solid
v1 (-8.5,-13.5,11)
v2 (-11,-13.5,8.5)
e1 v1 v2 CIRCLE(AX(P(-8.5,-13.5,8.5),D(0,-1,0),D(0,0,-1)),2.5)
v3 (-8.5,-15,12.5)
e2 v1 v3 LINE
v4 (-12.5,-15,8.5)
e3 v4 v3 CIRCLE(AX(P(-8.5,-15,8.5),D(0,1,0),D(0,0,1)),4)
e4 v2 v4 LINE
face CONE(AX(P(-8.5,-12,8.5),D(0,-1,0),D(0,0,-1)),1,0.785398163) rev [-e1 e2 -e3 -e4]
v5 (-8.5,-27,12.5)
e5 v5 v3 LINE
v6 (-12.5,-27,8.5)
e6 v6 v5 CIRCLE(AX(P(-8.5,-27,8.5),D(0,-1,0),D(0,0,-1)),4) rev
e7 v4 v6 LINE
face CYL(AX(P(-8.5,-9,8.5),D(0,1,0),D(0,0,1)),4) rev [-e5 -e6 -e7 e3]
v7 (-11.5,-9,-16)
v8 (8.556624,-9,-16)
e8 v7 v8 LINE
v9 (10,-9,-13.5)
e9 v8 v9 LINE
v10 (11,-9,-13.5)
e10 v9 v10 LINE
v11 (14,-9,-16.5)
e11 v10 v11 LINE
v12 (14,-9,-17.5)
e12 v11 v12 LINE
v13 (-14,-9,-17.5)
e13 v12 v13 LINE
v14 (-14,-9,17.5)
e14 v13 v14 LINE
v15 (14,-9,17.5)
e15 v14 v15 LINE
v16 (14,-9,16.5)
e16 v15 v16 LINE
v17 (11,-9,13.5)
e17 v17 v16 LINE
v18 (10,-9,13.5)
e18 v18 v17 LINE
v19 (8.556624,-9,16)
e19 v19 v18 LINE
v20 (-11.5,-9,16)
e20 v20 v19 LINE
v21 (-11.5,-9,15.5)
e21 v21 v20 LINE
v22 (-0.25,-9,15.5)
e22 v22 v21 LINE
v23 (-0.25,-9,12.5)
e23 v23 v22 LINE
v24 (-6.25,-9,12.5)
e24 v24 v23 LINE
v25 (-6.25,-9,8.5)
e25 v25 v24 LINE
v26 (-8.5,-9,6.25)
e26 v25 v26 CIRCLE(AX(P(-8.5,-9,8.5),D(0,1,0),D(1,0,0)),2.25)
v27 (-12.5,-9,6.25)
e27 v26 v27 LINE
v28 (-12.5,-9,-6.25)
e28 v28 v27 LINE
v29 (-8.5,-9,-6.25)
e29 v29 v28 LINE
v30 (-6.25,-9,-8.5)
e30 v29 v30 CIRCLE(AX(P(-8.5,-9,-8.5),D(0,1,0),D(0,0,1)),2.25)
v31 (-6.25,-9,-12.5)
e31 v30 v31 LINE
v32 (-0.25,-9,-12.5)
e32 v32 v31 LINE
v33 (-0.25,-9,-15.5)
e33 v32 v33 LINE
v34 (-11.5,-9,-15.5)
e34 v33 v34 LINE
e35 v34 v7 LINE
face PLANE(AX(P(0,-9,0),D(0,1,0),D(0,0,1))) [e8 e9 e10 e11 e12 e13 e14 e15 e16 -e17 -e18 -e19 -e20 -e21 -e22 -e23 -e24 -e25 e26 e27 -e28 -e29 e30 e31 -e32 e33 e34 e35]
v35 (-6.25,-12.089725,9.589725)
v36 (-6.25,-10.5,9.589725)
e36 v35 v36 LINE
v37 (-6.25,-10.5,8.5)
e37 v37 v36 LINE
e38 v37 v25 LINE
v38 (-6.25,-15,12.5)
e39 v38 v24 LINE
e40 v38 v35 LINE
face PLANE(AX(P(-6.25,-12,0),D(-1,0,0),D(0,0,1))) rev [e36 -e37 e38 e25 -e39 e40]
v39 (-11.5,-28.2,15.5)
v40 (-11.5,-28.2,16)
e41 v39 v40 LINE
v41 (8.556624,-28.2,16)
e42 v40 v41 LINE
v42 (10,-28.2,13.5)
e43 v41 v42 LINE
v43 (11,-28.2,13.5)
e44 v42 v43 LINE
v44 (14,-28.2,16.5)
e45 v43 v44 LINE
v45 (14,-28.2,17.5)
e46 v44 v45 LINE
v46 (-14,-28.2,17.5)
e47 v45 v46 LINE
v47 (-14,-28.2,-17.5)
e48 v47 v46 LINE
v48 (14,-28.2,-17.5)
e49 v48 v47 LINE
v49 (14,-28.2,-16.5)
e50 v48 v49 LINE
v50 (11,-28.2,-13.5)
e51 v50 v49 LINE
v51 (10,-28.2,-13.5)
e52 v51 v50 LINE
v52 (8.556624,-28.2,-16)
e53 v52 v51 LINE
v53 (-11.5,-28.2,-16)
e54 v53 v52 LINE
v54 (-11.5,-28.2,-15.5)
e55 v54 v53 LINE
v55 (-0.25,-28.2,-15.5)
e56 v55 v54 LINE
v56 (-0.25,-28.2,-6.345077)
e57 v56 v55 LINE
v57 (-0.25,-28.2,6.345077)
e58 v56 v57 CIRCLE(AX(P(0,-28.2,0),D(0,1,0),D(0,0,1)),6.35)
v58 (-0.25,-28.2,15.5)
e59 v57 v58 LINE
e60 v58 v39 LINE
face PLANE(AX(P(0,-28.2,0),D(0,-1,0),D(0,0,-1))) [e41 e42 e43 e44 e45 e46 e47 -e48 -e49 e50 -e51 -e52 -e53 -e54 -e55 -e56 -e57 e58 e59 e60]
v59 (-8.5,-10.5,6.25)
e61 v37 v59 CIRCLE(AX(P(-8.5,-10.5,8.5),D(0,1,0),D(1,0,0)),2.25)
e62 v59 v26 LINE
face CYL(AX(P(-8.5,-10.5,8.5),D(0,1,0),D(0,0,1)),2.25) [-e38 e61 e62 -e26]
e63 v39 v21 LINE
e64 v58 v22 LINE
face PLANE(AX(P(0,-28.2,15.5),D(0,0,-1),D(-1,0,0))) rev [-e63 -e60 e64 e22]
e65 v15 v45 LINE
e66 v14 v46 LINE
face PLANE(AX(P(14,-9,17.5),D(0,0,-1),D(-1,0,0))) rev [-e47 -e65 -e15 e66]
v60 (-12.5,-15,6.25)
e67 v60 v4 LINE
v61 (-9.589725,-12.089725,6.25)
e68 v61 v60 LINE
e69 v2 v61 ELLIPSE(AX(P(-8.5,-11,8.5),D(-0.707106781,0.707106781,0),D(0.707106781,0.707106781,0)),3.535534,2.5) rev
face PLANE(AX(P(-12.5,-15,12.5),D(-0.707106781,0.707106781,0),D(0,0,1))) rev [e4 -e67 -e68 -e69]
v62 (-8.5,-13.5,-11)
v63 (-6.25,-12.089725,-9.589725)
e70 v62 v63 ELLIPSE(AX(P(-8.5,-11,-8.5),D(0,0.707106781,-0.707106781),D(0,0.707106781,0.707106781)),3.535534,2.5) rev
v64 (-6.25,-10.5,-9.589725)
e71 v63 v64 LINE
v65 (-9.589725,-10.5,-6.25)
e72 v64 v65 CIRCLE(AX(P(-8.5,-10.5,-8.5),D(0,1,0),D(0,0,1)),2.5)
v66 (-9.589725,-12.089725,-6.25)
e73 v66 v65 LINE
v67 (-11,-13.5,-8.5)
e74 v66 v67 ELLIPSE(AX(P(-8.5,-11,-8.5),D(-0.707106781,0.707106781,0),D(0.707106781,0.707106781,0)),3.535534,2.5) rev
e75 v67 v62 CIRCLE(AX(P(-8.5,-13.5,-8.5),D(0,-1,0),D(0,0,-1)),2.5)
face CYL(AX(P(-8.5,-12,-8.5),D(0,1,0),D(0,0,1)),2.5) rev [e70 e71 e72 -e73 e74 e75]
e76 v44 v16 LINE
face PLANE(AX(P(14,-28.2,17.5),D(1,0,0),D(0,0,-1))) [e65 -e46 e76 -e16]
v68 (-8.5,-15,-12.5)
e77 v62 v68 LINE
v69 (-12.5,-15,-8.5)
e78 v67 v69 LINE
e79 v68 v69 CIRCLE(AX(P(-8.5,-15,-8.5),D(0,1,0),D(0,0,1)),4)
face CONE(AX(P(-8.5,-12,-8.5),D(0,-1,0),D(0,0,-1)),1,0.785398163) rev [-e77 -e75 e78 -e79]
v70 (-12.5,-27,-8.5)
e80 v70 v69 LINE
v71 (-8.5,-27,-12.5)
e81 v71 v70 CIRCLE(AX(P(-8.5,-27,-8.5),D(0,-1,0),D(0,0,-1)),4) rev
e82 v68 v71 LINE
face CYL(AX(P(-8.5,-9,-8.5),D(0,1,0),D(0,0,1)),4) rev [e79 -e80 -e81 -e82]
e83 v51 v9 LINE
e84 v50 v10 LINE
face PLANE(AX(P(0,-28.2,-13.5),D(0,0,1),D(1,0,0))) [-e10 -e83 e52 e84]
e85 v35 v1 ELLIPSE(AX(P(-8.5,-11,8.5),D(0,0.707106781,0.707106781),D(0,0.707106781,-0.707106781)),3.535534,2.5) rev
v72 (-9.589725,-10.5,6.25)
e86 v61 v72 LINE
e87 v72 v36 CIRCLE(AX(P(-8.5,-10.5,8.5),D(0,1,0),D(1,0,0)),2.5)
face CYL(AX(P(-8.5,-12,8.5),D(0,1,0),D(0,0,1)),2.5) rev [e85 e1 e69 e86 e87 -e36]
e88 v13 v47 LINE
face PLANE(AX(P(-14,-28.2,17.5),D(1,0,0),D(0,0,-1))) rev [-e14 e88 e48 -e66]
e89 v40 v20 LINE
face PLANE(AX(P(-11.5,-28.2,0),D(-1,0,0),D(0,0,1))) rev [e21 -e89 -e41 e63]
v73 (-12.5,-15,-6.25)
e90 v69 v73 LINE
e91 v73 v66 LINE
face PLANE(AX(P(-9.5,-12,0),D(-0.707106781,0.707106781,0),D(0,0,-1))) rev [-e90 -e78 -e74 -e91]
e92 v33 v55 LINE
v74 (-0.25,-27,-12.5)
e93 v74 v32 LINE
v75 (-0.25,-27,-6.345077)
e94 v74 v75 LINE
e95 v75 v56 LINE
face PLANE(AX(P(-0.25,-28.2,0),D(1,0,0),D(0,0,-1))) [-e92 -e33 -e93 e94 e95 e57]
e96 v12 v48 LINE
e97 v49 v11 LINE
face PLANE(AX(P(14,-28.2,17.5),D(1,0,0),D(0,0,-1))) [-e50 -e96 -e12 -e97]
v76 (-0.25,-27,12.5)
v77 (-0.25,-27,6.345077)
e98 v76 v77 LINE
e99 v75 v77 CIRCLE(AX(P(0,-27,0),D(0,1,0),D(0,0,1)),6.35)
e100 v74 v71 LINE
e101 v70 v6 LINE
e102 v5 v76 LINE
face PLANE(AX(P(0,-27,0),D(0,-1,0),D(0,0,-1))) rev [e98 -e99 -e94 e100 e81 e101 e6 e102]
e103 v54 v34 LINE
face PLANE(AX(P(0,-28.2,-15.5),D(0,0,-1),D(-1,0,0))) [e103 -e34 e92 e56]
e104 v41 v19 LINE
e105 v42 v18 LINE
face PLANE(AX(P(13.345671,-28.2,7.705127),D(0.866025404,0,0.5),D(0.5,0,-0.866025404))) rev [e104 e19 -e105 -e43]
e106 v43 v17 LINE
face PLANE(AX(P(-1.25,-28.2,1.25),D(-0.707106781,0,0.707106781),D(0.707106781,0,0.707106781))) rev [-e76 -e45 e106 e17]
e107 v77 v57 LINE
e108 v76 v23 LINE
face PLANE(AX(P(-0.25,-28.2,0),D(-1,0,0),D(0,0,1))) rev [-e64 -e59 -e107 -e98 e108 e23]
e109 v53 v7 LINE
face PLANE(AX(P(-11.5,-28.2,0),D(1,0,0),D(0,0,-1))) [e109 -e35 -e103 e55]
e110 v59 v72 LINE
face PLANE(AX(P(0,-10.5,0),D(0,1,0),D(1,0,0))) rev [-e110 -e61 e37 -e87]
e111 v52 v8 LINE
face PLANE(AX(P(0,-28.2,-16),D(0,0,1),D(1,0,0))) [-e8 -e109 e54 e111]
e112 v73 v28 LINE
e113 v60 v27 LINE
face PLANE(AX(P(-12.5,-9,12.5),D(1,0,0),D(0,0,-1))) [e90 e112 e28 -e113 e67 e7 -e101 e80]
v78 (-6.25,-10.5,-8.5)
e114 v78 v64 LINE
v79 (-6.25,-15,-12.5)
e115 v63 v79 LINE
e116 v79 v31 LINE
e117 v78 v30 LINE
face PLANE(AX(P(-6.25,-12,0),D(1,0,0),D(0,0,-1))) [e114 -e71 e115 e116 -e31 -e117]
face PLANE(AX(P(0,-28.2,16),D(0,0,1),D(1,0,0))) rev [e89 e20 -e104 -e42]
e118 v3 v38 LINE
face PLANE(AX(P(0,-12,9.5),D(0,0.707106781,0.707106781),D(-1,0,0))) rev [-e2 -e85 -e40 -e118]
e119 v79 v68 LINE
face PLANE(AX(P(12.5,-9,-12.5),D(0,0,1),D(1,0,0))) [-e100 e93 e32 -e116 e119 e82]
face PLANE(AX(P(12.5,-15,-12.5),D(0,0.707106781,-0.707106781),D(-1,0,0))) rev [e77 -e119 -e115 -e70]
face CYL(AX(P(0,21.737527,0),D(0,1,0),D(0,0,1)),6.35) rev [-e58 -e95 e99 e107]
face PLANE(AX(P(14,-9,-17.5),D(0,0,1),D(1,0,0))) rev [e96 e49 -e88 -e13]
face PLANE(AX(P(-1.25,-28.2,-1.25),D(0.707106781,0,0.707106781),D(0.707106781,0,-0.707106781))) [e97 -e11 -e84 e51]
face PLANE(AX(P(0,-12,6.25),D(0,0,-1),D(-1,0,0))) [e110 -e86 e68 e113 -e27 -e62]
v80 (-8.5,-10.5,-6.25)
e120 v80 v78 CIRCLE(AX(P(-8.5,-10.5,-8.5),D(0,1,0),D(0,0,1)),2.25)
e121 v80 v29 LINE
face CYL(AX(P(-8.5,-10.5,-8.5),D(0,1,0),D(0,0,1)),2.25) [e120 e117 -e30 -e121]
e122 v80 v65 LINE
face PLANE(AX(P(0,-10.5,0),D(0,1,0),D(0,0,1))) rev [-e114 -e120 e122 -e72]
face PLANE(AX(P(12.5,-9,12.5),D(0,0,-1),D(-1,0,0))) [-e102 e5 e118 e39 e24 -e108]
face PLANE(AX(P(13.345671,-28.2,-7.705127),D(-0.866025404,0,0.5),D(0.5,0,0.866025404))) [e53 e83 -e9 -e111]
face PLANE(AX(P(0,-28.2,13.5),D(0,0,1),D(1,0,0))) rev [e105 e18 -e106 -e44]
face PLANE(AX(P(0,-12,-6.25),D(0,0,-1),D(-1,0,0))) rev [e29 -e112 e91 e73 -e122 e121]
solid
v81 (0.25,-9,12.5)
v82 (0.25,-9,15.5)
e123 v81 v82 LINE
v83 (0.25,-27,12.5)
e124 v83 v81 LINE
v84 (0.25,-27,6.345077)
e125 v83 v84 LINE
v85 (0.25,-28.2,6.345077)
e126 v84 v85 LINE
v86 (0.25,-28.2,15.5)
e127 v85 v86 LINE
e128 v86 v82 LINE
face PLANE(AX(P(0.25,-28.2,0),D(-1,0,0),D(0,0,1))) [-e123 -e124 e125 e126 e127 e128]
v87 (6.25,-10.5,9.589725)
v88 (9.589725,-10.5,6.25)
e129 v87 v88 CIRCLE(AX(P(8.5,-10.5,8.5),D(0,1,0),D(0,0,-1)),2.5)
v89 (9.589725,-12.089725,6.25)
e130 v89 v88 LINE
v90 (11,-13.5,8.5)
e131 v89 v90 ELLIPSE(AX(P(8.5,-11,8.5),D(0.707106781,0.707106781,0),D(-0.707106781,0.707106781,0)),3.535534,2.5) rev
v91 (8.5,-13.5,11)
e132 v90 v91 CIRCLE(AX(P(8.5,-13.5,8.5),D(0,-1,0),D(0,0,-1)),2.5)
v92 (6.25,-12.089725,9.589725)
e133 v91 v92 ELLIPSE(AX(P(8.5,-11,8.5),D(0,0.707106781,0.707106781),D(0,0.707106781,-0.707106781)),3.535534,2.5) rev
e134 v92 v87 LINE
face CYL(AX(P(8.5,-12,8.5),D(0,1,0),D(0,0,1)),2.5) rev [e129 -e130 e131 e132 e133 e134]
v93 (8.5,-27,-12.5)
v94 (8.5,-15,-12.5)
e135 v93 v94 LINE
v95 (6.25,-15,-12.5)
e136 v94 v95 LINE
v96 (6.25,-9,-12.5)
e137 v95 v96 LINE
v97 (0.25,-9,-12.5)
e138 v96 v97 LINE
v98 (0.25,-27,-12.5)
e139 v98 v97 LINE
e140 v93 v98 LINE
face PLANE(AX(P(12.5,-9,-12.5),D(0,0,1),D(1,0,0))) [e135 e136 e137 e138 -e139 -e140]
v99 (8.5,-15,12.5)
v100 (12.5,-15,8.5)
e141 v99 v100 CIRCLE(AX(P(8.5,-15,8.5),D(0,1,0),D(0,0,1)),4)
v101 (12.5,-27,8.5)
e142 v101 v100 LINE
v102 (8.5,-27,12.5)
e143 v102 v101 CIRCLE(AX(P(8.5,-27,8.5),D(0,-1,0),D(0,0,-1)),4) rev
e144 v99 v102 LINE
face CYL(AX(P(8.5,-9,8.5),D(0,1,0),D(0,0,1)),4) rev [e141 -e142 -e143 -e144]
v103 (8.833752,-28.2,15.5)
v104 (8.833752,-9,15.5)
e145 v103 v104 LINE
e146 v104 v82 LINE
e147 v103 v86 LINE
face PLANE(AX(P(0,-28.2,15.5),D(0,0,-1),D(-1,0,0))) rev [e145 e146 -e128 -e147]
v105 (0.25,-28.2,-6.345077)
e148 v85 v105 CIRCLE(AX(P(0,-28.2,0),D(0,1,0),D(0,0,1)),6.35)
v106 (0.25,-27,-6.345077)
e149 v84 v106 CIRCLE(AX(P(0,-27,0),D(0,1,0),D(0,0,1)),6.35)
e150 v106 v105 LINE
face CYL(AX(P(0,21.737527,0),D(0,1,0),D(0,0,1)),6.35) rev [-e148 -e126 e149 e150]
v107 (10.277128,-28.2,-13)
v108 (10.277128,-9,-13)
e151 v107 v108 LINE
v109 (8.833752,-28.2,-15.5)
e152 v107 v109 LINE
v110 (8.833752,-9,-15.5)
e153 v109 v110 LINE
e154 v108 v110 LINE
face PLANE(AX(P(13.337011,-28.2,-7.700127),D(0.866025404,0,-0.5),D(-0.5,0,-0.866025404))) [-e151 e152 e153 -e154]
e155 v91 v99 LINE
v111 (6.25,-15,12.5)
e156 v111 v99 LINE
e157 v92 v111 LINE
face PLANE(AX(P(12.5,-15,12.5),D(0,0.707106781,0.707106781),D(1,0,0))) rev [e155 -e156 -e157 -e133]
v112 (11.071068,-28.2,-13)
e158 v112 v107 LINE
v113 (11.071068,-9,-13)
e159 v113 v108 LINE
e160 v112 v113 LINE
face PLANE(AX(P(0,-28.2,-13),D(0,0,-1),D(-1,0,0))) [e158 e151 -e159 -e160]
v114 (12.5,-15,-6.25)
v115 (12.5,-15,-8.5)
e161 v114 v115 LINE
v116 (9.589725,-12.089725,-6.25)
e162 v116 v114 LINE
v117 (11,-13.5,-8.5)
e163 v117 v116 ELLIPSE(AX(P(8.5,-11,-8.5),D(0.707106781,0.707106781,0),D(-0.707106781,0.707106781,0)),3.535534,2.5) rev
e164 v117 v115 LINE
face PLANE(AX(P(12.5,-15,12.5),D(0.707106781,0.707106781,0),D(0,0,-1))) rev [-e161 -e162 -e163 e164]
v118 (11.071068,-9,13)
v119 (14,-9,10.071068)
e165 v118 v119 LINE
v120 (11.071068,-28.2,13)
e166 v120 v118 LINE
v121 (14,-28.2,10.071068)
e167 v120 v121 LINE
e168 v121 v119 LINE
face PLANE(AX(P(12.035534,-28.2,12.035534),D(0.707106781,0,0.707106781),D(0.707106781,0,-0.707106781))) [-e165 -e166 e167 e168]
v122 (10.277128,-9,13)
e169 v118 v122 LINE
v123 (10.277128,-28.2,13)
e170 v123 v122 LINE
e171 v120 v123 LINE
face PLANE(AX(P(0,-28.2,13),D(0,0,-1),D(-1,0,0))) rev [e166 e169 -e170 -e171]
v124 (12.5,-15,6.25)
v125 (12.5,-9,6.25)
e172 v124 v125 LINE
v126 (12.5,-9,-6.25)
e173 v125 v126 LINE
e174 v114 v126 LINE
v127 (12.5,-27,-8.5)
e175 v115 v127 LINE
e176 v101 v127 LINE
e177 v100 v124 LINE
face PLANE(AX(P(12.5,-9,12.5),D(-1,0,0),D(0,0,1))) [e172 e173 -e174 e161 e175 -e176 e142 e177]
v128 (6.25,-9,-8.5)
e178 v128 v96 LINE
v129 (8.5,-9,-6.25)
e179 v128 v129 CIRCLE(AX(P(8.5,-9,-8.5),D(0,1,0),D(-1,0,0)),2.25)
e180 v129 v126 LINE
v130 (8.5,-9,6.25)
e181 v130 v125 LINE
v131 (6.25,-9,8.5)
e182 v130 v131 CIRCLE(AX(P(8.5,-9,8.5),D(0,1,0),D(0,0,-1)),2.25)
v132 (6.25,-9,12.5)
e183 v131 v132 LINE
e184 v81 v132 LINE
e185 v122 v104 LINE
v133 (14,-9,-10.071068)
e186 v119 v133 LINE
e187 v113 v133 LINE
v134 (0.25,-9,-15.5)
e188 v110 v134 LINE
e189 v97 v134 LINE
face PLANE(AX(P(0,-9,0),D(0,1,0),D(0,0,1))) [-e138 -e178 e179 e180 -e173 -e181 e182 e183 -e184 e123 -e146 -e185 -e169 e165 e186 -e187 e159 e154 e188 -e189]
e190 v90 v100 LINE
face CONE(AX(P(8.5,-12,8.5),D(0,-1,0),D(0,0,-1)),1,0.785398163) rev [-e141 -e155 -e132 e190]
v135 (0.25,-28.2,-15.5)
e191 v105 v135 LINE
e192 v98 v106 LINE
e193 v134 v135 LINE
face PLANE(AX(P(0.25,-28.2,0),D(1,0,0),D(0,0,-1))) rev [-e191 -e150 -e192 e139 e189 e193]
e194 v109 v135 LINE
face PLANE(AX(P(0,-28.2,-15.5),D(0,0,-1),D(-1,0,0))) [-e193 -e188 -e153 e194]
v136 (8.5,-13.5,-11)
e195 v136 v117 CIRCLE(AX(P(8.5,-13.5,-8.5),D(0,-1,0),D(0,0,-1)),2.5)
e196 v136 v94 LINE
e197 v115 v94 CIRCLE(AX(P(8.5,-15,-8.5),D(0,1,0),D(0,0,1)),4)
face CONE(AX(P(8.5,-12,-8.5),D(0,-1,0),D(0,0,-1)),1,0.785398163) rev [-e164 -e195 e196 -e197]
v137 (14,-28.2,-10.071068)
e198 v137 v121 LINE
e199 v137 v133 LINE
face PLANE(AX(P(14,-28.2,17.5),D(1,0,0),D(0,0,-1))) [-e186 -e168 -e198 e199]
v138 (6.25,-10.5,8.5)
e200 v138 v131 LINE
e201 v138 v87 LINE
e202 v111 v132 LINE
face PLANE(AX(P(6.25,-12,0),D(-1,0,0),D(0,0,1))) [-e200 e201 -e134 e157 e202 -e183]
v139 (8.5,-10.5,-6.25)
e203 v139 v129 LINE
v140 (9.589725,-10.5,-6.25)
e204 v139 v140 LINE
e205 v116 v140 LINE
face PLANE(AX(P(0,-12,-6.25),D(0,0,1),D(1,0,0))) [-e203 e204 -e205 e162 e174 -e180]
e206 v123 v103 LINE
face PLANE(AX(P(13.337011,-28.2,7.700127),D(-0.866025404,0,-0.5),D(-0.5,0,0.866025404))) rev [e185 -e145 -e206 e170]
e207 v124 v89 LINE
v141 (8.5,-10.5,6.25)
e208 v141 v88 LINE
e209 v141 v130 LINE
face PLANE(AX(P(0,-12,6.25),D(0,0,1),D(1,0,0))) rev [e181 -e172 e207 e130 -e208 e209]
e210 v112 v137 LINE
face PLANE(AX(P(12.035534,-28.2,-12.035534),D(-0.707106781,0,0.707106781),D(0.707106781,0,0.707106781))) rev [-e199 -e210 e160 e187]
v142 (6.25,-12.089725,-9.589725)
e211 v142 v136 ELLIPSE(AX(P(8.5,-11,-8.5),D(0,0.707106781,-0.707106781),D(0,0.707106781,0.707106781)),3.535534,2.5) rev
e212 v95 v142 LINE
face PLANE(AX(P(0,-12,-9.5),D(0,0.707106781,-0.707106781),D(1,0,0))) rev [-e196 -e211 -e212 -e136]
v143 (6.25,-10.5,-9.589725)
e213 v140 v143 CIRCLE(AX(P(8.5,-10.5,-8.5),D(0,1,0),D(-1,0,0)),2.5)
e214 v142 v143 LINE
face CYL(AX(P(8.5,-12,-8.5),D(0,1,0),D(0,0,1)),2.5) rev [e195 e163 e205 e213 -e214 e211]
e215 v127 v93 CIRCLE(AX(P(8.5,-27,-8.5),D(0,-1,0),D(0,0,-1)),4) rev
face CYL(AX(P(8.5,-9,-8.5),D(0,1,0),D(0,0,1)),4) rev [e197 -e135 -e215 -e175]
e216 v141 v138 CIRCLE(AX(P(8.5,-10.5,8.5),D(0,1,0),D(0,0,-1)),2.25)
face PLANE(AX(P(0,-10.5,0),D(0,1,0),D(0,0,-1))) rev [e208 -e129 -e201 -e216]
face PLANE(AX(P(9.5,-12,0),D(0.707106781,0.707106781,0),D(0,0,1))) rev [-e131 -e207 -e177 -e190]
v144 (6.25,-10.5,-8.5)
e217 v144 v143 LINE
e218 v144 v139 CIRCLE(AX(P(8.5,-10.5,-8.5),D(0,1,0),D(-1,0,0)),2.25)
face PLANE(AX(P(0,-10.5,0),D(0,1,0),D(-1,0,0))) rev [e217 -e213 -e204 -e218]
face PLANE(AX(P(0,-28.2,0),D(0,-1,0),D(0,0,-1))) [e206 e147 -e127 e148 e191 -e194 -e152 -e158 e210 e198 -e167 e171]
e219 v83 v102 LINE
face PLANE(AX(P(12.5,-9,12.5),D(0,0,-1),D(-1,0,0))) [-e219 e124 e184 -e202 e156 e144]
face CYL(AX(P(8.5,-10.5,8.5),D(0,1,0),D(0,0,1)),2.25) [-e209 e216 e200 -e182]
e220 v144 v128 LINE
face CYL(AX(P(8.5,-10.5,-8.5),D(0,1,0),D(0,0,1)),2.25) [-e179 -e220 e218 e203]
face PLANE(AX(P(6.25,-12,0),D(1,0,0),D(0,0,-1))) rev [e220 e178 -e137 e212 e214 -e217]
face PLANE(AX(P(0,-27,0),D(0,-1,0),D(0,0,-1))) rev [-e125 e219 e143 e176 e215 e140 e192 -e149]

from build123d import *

# Parameters (mm, degrees)
SKETCH1_W           = 8.4
SKETCH1_H           = 3
SKETCH2_OUTSIDE_W   = 44.372
SKETCH2_OUTSIDE_H   = 44.372
SKETCH2_OUTSIDE_W_2 = 28
SKETCH2_OUTSIDE_H_2 = 35
CUT_EXTRUDE2_DEPTH  = 24.70949177
SKETCH2_3_W         = 28
SKETCH2_3_H         = 35
SKETCH2_3_W_2       = 25
SKETCH2_3_H_2       = 25
BOSS_EXTRUDE1_DEPTH = 15
BOSS_EXTRUDE2_START = -4.2
BOSS_EXTRUDE2_DEPTH = 4.2
FILLET1_R           = 4
BOSS_EXTRUDE4_DEPTH = 3
SKETCH3_5_R         = 2.25
SKETCH3_5_R_2       = 1.45
BOSS_EXTRUDE6_DEPTH = 1.5
SKETCH3_R           = 1.45
BOSS_EXTRUDE3_DEPTH = 1.5
CIRPATTERN7_COUNT   = 4
CHAMFER1_SIZE       = 3
CUT_EXTRUDE6_START  = -3
CUT_EXTRUDE6_DEPTH  = 3
CUT_EXTRUDE5_START  = -19.2
CUT_EXTRUDE5_DEPTH  = 19.2


# Read off the part's stored shape, not the designer's step: Cut-Extrude5
with BuildPart() as part:
    # Sketch1 → Revolve2 (revolve)
    with BuildSketch(Plane.XY, mode=Mode.PRIVATE) as revolve2_sk:
        with Locations((-12.3, -25.5)):
            Rectangle(SKETCH1_W, SKETCH1_H)
        Polygon((-6.35, -27), (-8.1, -27), (-16.5, -27), (-16.5, -28.2), (-8.1, -28.2), (-6.35, -28.2), align=None)
    revolve(revolve2_sk.sketch.rotate(Axis((0, 21.737527327, 0), (0, -1, 0)), 270), axis=Axis((0, 21.737527327, 0), (0, -1, 0)))

    # Sketch2 outside → Cut-Extrude2 (cut, through all)
    with BuildSketch(Plane(origin=(0, -24, 0), x_dir=(1, 0, 0), z_dir=(0, 1, 0))):
        Rectangle(SKETCH2_OUTSIDE_W, SKETCH2_OUTSIDE_H)
        Rectangle(SKETCH2_OUTSIDE_W_2, SKETCH2_OUTSIDE_H_2, mode=Mode.SUBTRACT)
    extrude(amount=-CUT_EXTRUDE2_DEPTH, mode=Mode.SUBTRACT)

    # Sketch2<3> → Boss-Extrude1 (add)
    with BuildSketch(Plane(origin=(0, -24, 0), x_dir=(1, 0, 0), z_dir=(0, 1, 0))):
        Rectangle(SKETCH2_3_W, SKETCH2_3_H)
        Rectangle(SKETCH2_3_W_2, SKETCH2_3_H_2, mode=Mode.SUBTRACT)
    extrude(amount=BOSS_EXTRUDE1_DEPTH)

    # Sketch2<4> → Boss-Extrude2 (add)
    with BuildSketch(Plane(origin=(0, -24, 0), x_dir=(1, 0, 0), z_dir=(0, 1, 0)).offset(BOSS_EXTRUDE2_START)):
        with BuildLine():
            Line((-12.5, -12.5), (-10.770329614, -12.5))
            ThreePointArc((-10.770329614, -12.5), (-11.66726189, -11.66726189), (-12.5, -10.770329614))
            Line((-12.5, -10.770329614), (-12.5, -12.5))
        make_face()
        with BuildLine():
            Line((12.5, -10.770329614), (12.5, -12.5))
            Line((12.5, -12.5), (10.770329614, -12.5))
            ThreePointArc((10.770329614, -12.5), (0, -16.5), (-10.770329614, -12.5))
            Line((-10.770329614, -12.5), (-12.5, -12.5))
            Line((-12.5, -12.5), (-12.5, -10.770329614))
            ThreePointArc((-12.5, -10.770329614), (-13.289133528, -9.7800271), (-14, -8.732124598))
            Line((-14, -8.732124598), (-14, -17.5))
            Line((-14, -17.5), (14, -17.5))
            Line((14, -17.5), (14, -8.732124598))
            ThreePointArc((14, -8.732124598), (13.289133528, -9.7800271), (12.5, -10.770329614))
        make_face()
        with BuildLine():
            Line((10.770329614, -12.5), (12.5, -12.5))
            Line((12.5, -12.5), (12.5, -10.770329614))
            ThreePointArc((12.5, -10.770329614), (11.66726189, -11.66726189), (10.770329614, -12.5))
        make_face()
        with BuildLine():
            Line((12.5, 12.5), (12.5, 10.770329614))
            ThreePointArc((12.5, 10.770329614), (13.289133528, 9.7800271), (14, 8.732124598))
            Line((14, 8.732124598), (14, 17.5))
            Line((14, 17.5), (-14, 17.5))
            Line((-14, 17.5), (-14, 8.732124598))
            ThreePointArc((-14, 8.732124598), (-13.289133528, 9.7800271), (-12.5, 10.770329614))
            Line((-12.5, 10.770329614), (-12.5, 12.5))
            Line((-12.5, 12.5), (-10.770329614, 12.5))
            ThreePointArc((-10.770329614, 12.5), (0, 16.5), (10.770329614, 12.5))
            Line((10.770329614, 12.5), (12.5, 12.5))
        make_face()
        with BuildLine():
            ThreePointArc((10.770329614, 12.5), (11.66726189, 11.66726189), (12.5, 10.770329614))
            Line((12.5, 10.770329614), (12.5, 12.5))
            Line((12.5, 12.5), (10.770329614, 12.5))
        make_face()
        with BuildLine():
            Line((-12.5, 12.5), (-12.5, 10.770329614))
            ThreePointArc((-12.5, 10.770329614), (-11.66726189, 11.66726189), (-10.770329614, 12.5))
            Line((-10.770329614, 12.5), (-12.5, 12.5))
        make_face()
    extrude(amount=BOSS_EXTRUDE2_DEPTH)

    # Fillet1
    fillet1_edges = [part.edges().sort_by_distance(p)[0] for p in [
        (-12.5, -16.5, 12.5),
        (12.5, -16.5, 12.5),
        (12.5, -16.5, -12.5),
        (-12.5, -16.5, -12.5),
    ]]
    fillet(fillet1_edges, radius=FILLET1_R)

    # Sketch3<3> → Boss-Extrude4 (add)
    with BuildSketch(Plane(origin=(0, -9, 0), x_dir=(1, 0, 0), z_dir=(0, 1, 0))):
        with BuildLine():
            Line((-12.5, 12.5), (-12.5, 8.5))
            ThreePointArc((-12.5, 8.5), (-11.328427125, 11.328427125), (-8.5, 12.5))
            Line((-8.5, 12.5), (-12.5, 12.5))
        make_face()
        with BuildLine():
            Line((-12.5, 6.25), (-9.589724736, 6.25))
            ThreePointArc((-9.589724736, 6.25), (-10.267766953, 10.267766953), (-6.25, 9.589724736))
            Line((-6.25, 9.589724736), (-6.25, 12.5))
            Line((-6.25, 12.5), (-8.5, 12.5))
            ThreePointArc((-8.5, 12.5), (-11.328427125, 11.328427125), (-12.5, 8.5))
            Line((-12.5, 8.5), (-12.5, 6.25))
        make_face()
    boss_extrude4 = extrude(amount=-BOSS_EXTRUDE4_DEPTH)

    # Sketch3<5> → Boss-Extrude6 (add)
    # profile 1 of 2: a face of its own
    with BuildSketch(Plane(origin=(0, -9, 0), x_dir=(1, 0, 0), z_dir=(0, 1, 0))):
        with BuildLine():
            Line((-9.589724736, 6.25), (-8.5, 6.25))
            ThreePointArc((-8.5, 6.25), (-10.090990258, 10.090990258), (-6.25, 8.5))
            Line((-6.25, 8.5), (-6.25, 9.589724736))
            ThreePointArc((-6.25, 9.589724736), (-10.267766953, 10.267766953), (-9.589724736, 6.25))
        make_face()
    # profile 2 of 2: a face of its own
    with BuildSketch(Plane(origin=(0, -9, 0), x_dir=(1, 0, 0), z_dir=(0, 1, 0))):
        with Locations((-8.5, 8.5)):
            Circle(SKETCH3_5_R)
        with Locations(Location((-8.5, 8.5, 0), (0, 0, 270))):
            Circle(SKETCH3_5_R_2, mode=Mode.SUBTRACT)
    boss_extrude6 = extrude(amount=-BOSS_EXTRUDE6_DEPTH)

    # Sketch3 → Boss-Extrude3 (add)
    with BuildSketch(Plane(origin=(0, -9, 0), x_dir=(1, 0, 0), z_dir=(0, 1, 0))):
        with Locations((-8.5, 8.5)):
            Circle(SKETCH3_R)
    boss_extrude3 = extrude(amount=-BOSS_EXTRUDE3_DEPTH)

    # CirPattern7: Boss-Extrude4, Boss-Extrude6, Boss-Extrude3 ×4 about axis
    cirpattern7_axis = Axis((0, 0, 0), (0, 1, 0))
    add([boss_extrude4.rotate(cirpattern7_axis, i * 360 / CIRPATTERN7_COUNT) for i in range(1, CIRPATTERN7_COUNT)])
    add([boss_extrude6.rotate(cirpattern7_axis, i * 360 / CIRPATTERN7_COUNT) for i in range(1, CIRPATTERN7_COUNT)])
    add([boss_extrude3.rotate(cirpattern7_axis, i * 360 / CIRPATTERN7_COUNT) for i in range(1, CIRPATTERN7_COUNT)])

    # Chamfer1
    # the kernel refuses this chamfer: 3 mm, written as the material it adds along each edge
    with BuildSketch(Plane(origin=(-8.5, -12, -8.5), x_dir=(0, 0, -1), z_dir=(1, 0, 0))) as chamfer1_piece_1_section:
        Polygon((4, -CHAMFER1_SIZE), (4 - CHAMFER1_SIZE, 0), (4, 0), align=None)
    chamfer1_piece_1 = revolve(axis=Axis((-8.5, -12, -8.5), (0, 1, 0)), revolution_arc=90, mode=Mode.PRIVATE)
    chamfer1_piece_1 = chamfer1_piece_1 - Plane(origin=(-8.5, -13.21364555, -8.5), x_dir=(-0.4358898943541021, 0, 0.8999999999999833), z_dir=(0, 1, 0)) * Cylinder(2.5, 16, mode=Mode.PRIVATE)
    add(chamfer1_piece_1)
    with BuildSketch(Plane(origin=(-6.25, -12, -12.5), x_dir=(0, -0.9996219169112969, -0.02749587661058621), z_dir=(-1, 0, 0))) as chamfer1_piece_2_section:
        Polygon((CHAMFER1_SIZE * 0.999621916911, CHAMFER1_SIZE * 0.0274958766106), (-CHAMFER1_SIZE * 0.0274958766106, CHAMFER1_SIZE * 0.999621916911), (0, 0), align=None)
    chamfer1_piece_2 = extrude(amount=2.25, mode=Mode.PRIVATE)
    chamfer1_piece_2 = chamfer1_piece_2 - Plane(origin=(-8.5, -13.109465827, -8.5), x_dir=(-0.4358898943541021, 0, 0.8999999999999833), z_dir=(0, 1, 0)) * Cylinder(2.5, 17, mode=Mode.PRIVATE)
    add(chamfer1_piece_2)
    with BuildSketch(Plane(origin=(-12.5, -12, -8.5), x_dir=(-0.027495876610586206, -0.9996219169112968, 0), z_dir=(0, 0, 1))) as chamfer1_piece_3_section:
        Polygon((CHAMFER1_SIZE * 0.999621916911, CHAMFER1_SIZE * 0.0274958766106), (-CHAMFER1_SIZE * 0.0274958766106, CHAMFER1_SIZE * 0.999621916911), (0, 0), align=None)
    chamfer1_piece_3 = extrude(amount=2.25, mode=Mode.PRIVATE)
    chamfer1_piece_3 = chamfer1_piece_3 - Plane(origin=(-8.5, -13.109465904, -8.5), x_dir=(-0.4358898943541021, 0, 0.8999999999999833), z_dir=(0, 1, 0)) * Cylinder(2.5, 17, mode=Mode.PRIVATE)
    add(chamfer1_piece_3)
    with BuildSketch(Plane(origin=(-8.5, -12, 8.5), x_dir=(-1, 0, 0), z_dir=(0, 0, -1))) as chamfer1_piece_4_section:
        Polygon((4, -CHAMFER1_SIZE), (4 - CHAMFER1_SIZE, 0), (4, 0), align=None)
    chamfer1_piece_4 = revolve(axis=Axis((-8.5, -12, 8.5), (0, 1, 0)), revolution_arc=90, mode=Mode.PRIVATE)
    chamfer1_piece_4 = chamfer1_piece_4 - Plane(origin=(-8.5, -13.21364555, 8.5), x_dir=(0.8999999999999833, 0, 0.4358898943541022), z_dir=(0, 1, 0)) * Cylinder(2.5, 16, mode=Mode.PRIVATE)
    add(chamfer1_piece_4)
    with BuildSketch(Plane(origin=(-12.5, -12, 6.25), x_dir=(-0.027495876610578136, -0.9996219169112969, 0), z_dir=(0, 0, 1))) as chamfer1_piece_5_section:
        Polygon((CHAMFER1_SIZE * 0.999621916911, CHAMFER1_SIZE * 0.0274958766106), (-CHAMFER1_SIZE * 0.0274958766106, CHAMFER1_SIZE * 0.999621916911), (0, 0), align=None)
    chamfer1_piece_5 = extrude(amount=2.25, mode=Mode.PRIVATE)
    chamfer1_piece_5 = chamfer1_piece_5 - Plane(origin=(-8.5, -13.109465827, 8.5), x_dir=(0.8999999999999833, 0, 0.4358898943541022), z_dir=(0, 1, 0)) * Cylinder(2.5, 17, mode=Mode.PRIVATE)
    add(chamfer1_piece_5)
    with BuildSketch(Plane(origin=(-8.5, -12, 12.5), x_dir=(0, -0.9996219169112969, 0.02749587661058621), z_dir=(1, 0, 0))) as chamfer1_piece_6_section:
        Polygon((CHAMFER1_SIZE * 0.999621916911, CHAMFER1_SIZE * 0.0274958766106), (-CHAMFER1_SIZE * 0.0274958766106, CHAMFER1_SIZE * 0.999621916911), (0, 0), align=None)
    chamfer1_piece_6 = extrude(amount=2.25, mode=Mode.PRIVATE)
    chamfer1_piece_6 = chamfer1_piece_6 - Plane(origin=(-8.5, -13.109465224, 8.5), x_dir=(0.8999999999999833, 0, 0.4358898943541022), z_dir=(0, 1, 0)) * Cylinder(2.5, 17, mode=Mode.PRIVATE)
    add(chamfer1_piece_6)
    with BuildSketch(Plane(origin=(8.5, -12, 8.5), x_dir=(0, 0, 1), z_dir=(-1, 0, 0))) as chamfer1_piece_7_section:
        Polygon((4, -CHAMFER1_SIZE), (4 - CHAMFER1_SIZE, 0), (4, 0), align=None)
    chamfer1_piece_7 = revolve(axis=Axis((8.5, -12, 8.5), (0, 1, 0)), revolution_arc=90, mode=Mode.PRIVATE)
    chamfer1_piece_7 = chamfer1_piece_7 - Plane(origin=(8.5, -13.21364555, 8.5), x_dir=(0.4358898943541022, 0, -0.8999999999999833), z_dir=(0, 1, 0)) * Cylinder(2.5, 16, mode=Mode.PRIVATE)
    add(chamfer1_piece_7)
    with BuildSketch(Plane(origin=(6.25, -12, 12.5), x_dir=(0, -0.9996219169112969, 0.02749587661057756), z_dir=(1, 0, 0))) as chamfer1_piece_8_section:
        Polygon((CHAMFER1_SIZE * 0.999621916911, CHAMFER1_SIZE * 0.0274958766106), (-CHAMFER1_SIZE * 0.0274958766106, CHAMFER1_SIZE * 0.999621916911), (0, 0), align=None)
    chamfer1_piece_8 = extrude(amount=2.25, mode=Mode.PRIVATE)
    chamfer1_piece_8 = chamfer1_piece_8 - Plane(origin=(8.5, -13.109465827, 8.5), x_dir=(0.4358898943541022, 0, -0.8999999999999833), z_dir=(0, 1, 0)) * Cylinder(2.5, 17, mode=Mode.PRIVATE)
    add(chamfer1_piece_8)
    with BuildSketch(Plane(origin=(12.5, -12, 8.5), x_dir=(0.02749587661059426, -0.9996219169112965, 0), z_dir=(0, 0, -1))) as chamfer1_piece_9_section:
        Polygon((CHAMFER1_SIZE * 0.999621916911, CHAMFER1_SIZE * 0.0274958766106), (-CHAMFER1_SIZE * 0.0274958766106, CHAMFER1_SIZE * 0.999621916911), (0, 0), align=None)
    chamfer1_piece_9 = extrude(amount=2.25, mode=Mode.PRIVATE)
    chamfer1_piece_9 = chamfer1_piece_9 - Plane(origin=(8.5, -13.109465969, 8.5), x_dir=(0.4358898943541022, 0, -0.8999999999999833), z_dir=(0, 1, 0)) * Cylinder(2.5, 17, mode=Mode.PRIVATE)
    add(chamfer1_piece_9)
    with BuildSketch(Plane(origin=(8.5, -12, -8.5), x_dir=(1, 0, 0), z_dir=(0, 0, 1))) as chamfer1_piece_10_section:
        Polygon((4, -CHAMFER1_SIZE), (4 - CHAMFER1_SIZE, 0), (4, 0), align=None)
    chamfer1_piece_10 = revolve(axis=Axis((8.5, -12, -8.5), (0, 1, 0)), revolution_arc=90, mode=Mode.PRIVATE)
    chamfer1_piece_10 = chamfer1_piece_10 - Plane(origin=(8.5, -13.21364555, -8.5), x_dir=(-0.8999999999999831, 0, -0.4358898943541023), z_dir=(0, 1, 0)) * Cylinder(2.5, 16, mode=Mode.PRIVATE)
    add(chamfer1_piece_10)
    with BuildSketch(Plane(origin=(12.5, -12, -6.25), x_dir=(0.02749587661058506, -0.9996219169112969, 0), z_dir=(0, 0, -1))) as chamfer1_piece_11_section:
        Polygon((CHAMFER1_SIZE * 0.999621916911, CHAMFER1_SIZE * 0.0274958766106), (-CHAMFER1_SIZE * 0.0274958766106, CHAMFER1_SIZE * 0.999621916911), (0, 0), align=None)
    chamfer1_piece_11 = extrude(amount=2.25, mode=Mode.PRIVATE)
    chamfer1_piece_11 = chamfer1_piece_11 - Plane(origin=(8.5, -13.109465859, -8.5), x_dir=(-0.8999999999999831, 0, -0.4358898943541023), z_dir=(0, 1, 0)) * Cylinder(2.5, 17, mode=Mode.PRIVATE)
    add(chamfer1_piece_11)
    with BuildSketch(Plane(origin=(8.5, -12, -12.5), x_dir=(0, -0.9996219169112965, -0.027495876610595413), z_dir=(-1, 0, 0))) as chamfer1_piece_12_section:
        Polygon((CHAMFER1_SIZE * 0.999621916911, CHAMFER1_SIZE * 0.0274958766106), (-CHAMFER1_SIZE * 0.0274958766106, CHAMFER1_SIZE * 0.999621916911), (0, 0), align=None)
    chamfer1_piece_12 = extrude(amount=2.25, mode=Mode.PRIVATE)
    chamfer1_piece_12 = chamfer1_piece_12 - Plane(origin=(8.5, -13.109465904, -8.5), x_dir=(-0.8999999999999831, 0, -0.4358898943541023), z_dir=(0, 1, 0)) * Cylinder(2.5, 17, mode=Mode.PRIVATE)
    add(chamfer1_piece_12)

    # Sketch5 → Cut-Extrude6 (cut)
    with BuildSketch(Plane(origin=(0, -24, 0), x_dir=(1, 0, 0), z_dir=(0, 1, 0)).offset(CUT_EXTRUDE6_START)):
        with BuildLine():
            Line((8.5, 12.5), (-8.5, 12.5))
            ThreePointArc((-8.5, 12.5), (-11.328427125, 11.328427125), (-12.5, 8.5))
            Line((-12.5, 8.5), (-12.5, -8.5))
            ThreePointArc((-12.5, -8.5), (-11.328427125, -11.328427125), (-8.5, -12.5))
            Line((-8.5, -12.5), (8.5, -12.5))
            ThreePointArc((8.5, -12.5), (11.328427125, -11.328427125), (12.5, -8.5))
            Line((12.5, -8.5), (12.5, 8.5))
            ThreePointArc((12.5, 8.5), (11.328427125, 11.328427125), (8.5, 12.5))
        make_face()
    extrude(amount=CUT_EXTRUDE6_DEPTH, mode=Mode.SUBTRACT)

    # Cut-Extrude5 outline → Cut-Extrude5 (cut)
    with BuildSketch(Plane(origin=(0, -9, 0), x_dir=(1, 0, 0), z_dir=(0, 1, 0)).offset(CUT_EXTRUDE5_START)):
        with BuildLine():
            Line((10.277128129, 13), (11.071067812, 13))
            Line((11.071067812, 13), (14, 10.071067812))
            Line((14, 10.071067812), (14, 16.5))
            Line((14, 16.5), (11, 13.5))
            Line((11, 13.5), (10, 13.5))
            Line((10, 13.5), (8.556624327, 16))
            Line((8.556624327, 16), (-11.5, 16))
            Line((-11.5, 16), (-11.5, 15.5))
            Line((-11.5, 15.5), (-0.25, 15.5))
            Line((-0.25, 15.5), (-0.25, 6.345076832))
            ThreePointArc((-0.25, 6.345076832), (0, 6.35), (0.25, 6.345076832))
            Line((0.25, 6.345076832), (0.25, 15.5))
            Line((0.25, 15.5), (8.833752456, 15.5))
            Line((8.833752456, 15.5), (10.277128129, 13))
        make_face()
    cut_extrude5 = extrude(amount=CUT_EXTRUDE5_DEPTH, mode=Mode.SUBTRACT)

    # Mirror1: Cut-Extrude5 across plane
    add(cut_extrude5.mirror(Plane.XY), mode=Mode.SUBTRACT)


solid = part.part
